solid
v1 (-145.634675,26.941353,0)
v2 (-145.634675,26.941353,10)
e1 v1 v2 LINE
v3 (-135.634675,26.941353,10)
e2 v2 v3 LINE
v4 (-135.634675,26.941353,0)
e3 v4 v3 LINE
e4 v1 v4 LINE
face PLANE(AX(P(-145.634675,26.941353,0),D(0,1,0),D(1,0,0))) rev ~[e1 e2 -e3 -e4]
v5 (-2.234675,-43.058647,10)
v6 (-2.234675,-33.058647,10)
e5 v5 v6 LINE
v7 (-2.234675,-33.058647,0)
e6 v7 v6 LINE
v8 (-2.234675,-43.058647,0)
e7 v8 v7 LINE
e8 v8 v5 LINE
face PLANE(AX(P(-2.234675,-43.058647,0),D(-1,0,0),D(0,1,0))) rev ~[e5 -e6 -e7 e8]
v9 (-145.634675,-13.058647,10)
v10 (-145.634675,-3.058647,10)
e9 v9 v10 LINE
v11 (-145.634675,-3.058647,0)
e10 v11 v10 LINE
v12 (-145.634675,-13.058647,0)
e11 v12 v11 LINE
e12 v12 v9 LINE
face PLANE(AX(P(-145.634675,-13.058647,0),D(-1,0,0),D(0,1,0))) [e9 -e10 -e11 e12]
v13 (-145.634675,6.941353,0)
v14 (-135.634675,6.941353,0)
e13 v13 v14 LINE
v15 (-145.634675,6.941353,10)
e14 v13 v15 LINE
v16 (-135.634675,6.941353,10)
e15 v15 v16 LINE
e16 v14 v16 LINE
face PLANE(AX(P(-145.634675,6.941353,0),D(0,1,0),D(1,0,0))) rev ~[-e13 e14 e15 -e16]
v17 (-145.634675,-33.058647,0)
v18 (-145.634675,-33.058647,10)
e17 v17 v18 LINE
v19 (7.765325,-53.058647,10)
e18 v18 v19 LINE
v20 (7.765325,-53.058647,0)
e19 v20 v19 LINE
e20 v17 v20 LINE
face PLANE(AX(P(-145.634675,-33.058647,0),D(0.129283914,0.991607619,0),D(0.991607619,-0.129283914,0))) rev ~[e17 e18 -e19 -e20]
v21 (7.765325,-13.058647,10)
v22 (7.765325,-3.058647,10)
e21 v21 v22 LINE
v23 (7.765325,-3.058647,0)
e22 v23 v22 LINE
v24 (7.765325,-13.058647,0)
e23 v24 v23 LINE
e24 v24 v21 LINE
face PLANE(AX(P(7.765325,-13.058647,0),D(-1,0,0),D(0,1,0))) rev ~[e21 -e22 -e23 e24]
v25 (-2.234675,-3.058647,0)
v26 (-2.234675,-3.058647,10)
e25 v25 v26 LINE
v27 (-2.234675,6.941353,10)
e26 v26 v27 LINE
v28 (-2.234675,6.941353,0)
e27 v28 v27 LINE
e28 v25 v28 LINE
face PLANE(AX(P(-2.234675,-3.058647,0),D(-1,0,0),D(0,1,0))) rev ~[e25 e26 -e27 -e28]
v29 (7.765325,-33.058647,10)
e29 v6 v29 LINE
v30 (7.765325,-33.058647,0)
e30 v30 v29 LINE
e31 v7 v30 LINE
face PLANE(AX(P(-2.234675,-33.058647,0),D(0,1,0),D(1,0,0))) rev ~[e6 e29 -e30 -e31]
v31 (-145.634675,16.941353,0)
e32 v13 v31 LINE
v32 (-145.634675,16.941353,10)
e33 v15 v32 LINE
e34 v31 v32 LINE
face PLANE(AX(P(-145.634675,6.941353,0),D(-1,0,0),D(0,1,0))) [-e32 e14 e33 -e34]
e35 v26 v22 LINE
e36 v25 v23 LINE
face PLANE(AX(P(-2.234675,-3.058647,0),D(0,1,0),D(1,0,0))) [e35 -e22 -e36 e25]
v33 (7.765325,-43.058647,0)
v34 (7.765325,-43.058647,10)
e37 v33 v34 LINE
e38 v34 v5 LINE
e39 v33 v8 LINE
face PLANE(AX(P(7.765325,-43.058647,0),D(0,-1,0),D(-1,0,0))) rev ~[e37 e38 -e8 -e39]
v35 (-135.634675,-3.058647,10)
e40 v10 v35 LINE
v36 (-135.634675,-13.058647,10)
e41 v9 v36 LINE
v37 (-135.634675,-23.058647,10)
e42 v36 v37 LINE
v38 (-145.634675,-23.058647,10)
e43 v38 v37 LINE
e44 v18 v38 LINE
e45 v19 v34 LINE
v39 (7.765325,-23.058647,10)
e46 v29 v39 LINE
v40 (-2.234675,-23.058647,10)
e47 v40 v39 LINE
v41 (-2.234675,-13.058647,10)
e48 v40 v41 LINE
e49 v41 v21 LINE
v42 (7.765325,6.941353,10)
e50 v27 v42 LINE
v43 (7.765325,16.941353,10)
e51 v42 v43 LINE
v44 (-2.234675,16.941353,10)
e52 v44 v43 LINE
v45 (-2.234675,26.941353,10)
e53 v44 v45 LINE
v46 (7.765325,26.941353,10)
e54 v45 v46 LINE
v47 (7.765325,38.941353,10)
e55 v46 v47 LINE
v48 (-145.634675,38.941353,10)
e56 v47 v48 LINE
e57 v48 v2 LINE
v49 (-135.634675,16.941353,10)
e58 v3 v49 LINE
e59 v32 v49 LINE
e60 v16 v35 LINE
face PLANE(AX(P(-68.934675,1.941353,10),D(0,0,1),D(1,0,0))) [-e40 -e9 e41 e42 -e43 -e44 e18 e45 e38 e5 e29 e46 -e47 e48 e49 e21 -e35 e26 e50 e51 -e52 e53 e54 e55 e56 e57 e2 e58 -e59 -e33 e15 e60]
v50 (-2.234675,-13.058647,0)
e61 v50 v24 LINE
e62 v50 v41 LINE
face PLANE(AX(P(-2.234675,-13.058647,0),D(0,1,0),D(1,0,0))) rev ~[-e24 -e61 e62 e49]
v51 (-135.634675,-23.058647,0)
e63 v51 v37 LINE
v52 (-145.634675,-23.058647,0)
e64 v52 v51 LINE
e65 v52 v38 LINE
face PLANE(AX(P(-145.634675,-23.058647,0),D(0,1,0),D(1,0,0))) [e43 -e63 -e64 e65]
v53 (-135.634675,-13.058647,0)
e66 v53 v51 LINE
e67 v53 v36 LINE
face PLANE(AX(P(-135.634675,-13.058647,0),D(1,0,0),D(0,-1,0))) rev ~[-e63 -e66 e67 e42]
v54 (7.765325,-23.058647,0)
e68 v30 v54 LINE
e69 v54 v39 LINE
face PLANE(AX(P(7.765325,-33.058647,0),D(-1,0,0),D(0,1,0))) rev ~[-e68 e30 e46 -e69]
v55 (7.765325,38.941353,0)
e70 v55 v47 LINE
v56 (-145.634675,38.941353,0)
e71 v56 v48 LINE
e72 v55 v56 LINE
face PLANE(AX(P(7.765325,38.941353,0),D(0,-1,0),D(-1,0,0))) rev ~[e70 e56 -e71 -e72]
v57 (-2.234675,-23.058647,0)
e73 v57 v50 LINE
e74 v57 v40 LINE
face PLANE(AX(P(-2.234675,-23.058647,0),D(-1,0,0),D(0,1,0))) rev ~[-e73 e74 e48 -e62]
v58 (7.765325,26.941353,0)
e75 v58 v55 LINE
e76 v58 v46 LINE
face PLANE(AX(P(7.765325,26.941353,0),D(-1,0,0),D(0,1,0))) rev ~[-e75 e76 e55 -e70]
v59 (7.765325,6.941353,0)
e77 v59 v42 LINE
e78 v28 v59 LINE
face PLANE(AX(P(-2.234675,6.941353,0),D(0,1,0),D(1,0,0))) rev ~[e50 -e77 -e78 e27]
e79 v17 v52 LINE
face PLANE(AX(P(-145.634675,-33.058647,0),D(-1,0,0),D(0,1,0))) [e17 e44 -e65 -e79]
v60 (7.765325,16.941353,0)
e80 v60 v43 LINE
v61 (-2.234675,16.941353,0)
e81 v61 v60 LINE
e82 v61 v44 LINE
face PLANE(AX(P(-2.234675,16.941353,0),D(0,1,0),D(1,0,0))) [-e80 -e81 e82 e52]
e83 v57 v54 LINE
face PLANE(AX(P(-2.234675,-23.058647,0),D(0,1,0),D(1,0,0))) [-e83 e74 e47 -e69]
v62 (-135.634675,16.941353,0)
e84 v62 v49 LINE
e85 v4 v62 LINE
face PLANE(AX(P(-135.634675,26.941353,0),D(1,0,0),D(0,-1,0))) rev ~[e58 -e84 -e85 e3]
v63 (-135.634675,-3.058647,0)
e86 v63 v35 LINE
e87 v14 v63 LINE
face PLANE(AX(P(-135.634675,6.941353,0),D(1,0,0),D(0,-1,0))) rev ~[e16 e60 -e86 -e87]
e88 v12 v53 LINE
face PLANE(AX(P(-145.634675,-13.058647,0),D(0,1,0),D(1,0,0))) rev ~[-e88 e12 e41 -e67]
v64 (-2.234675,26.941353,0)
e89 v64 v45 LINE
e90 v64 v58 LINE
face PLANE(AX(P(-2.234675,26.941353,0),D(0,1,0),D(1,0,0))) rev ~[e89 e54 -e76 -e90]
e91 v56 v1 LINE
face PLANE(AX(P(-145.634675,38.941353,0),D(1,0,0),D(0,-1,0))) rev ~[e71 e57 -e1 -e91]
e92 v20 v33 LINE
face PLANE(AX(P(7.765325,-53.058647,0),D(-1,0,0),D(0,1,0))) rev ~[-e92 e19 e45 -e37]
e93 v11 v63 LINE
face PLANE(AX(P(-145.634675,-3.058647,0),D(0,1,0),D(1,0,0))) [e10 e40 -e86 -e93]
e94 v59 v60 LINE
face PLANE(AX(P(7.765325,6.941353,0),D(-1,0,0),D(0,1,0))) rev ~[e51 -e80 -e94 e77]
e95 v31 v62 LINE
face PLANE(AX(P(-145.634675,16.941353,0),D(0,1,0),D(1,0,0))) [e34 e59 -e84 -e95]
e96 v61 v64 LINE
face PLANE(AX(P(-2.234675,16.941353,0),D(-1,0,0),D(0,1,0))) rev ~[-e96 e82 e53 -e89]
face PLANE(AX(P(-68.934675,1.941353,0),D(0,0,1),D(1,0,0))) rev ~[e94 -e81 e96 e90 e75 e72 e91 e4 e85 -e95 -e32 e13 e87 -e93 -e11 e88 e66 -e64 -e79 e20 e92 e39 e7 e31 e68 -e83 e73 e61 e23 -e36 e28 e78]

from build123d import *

# Parameters (mm, degrees)
F0_W     = 10
F0_H     = 10
F1_DEPTH = 10


# Not quite as in the source:
# - a feature names something its author has since deleted; it is built from what else it names


with BuildPart() as f1:
    # F0 (on Top) → F1 (new body)
    with BuildSketch(Plane.XY):
        Polygon((-2.2346749902, 36.9413525529), (-135.6346749902, 36.9413525529), (-135.6346749902, 26.9413525529), (-135.6346749902, 16.9413525529), (-135.6346749902, 6.9413525529), (-135.6346749902, -3.0586474471), (-135.6346749902, -13.0586474471), (-135.6346749902, -23.0586474471), (-135.6346749902, -33.0586474471), (-2.2346749902, -33.0586474471), (-2.2346749902, -23.0586474471), (-2.2346749902, -13.0586474471), (-2.2346749902, -3.0586474471), (-2.2346749902, 6.9413525529), (-2.2346749902, 16.9413525529), (-2.2346749902, 26.9413525529), align=None)
        with Locations((-140.6346749902, 31.9413525529)):
            Rectangle(F0_W, F0_H)
        with Locations((-140.6346749902, 11.9413525529)):
            Rectangle(F0_W, F0_H)
        with Locations((-140.6346749902, -8.0586474471)):
            Rectangle(F0_W, F0_H)
        with Locations((-140.6346749902, -28.0586474471)):
            Rectangle(F0_W, F0_H)
        with Locations((2.7653250098, 31.9413525529)):
            Rectangle(F0_W, F0_H)
        with Locations((2.7653250098, 11.9413525529)):
            Rectangle(F0_W, F0_H)
        with Locations((2.7653250098, -8.0586474471)):
            Rectangle(F0_W, F0_H)
        with Locations((2.7653250098, -28.0586474471)):
            Rectangle(F0_W, F0_H)
        Polygon((-135.6346749902, -33.0586474471), (-145.6346749902, -33.0586474471), (-2.2346749902, -51.7548664823), (-2.2346749902, -43.0586474471), (-2.2346749902, -33.0586474471), align=None)
        Polygon((-2.2346749902, -43.0586474471), (-2.2346749902, -51.7548664823), (7.7653250098, -53.0586474471), (7.7653250098, -43.0586474471), align=None)
        Polygon((-145.6346749902, 38.9413525529), (-145.6346749902, 36.9413525529), (-135.6346749902, 36.9413525529), (-2.2346749902, 36.9413525529), (7.7653250098, 36.9413525529), (7.7653250098, 38.9413525529), align=None)
    extrude(amount=F1_DEPTH)


solid = f1.part
